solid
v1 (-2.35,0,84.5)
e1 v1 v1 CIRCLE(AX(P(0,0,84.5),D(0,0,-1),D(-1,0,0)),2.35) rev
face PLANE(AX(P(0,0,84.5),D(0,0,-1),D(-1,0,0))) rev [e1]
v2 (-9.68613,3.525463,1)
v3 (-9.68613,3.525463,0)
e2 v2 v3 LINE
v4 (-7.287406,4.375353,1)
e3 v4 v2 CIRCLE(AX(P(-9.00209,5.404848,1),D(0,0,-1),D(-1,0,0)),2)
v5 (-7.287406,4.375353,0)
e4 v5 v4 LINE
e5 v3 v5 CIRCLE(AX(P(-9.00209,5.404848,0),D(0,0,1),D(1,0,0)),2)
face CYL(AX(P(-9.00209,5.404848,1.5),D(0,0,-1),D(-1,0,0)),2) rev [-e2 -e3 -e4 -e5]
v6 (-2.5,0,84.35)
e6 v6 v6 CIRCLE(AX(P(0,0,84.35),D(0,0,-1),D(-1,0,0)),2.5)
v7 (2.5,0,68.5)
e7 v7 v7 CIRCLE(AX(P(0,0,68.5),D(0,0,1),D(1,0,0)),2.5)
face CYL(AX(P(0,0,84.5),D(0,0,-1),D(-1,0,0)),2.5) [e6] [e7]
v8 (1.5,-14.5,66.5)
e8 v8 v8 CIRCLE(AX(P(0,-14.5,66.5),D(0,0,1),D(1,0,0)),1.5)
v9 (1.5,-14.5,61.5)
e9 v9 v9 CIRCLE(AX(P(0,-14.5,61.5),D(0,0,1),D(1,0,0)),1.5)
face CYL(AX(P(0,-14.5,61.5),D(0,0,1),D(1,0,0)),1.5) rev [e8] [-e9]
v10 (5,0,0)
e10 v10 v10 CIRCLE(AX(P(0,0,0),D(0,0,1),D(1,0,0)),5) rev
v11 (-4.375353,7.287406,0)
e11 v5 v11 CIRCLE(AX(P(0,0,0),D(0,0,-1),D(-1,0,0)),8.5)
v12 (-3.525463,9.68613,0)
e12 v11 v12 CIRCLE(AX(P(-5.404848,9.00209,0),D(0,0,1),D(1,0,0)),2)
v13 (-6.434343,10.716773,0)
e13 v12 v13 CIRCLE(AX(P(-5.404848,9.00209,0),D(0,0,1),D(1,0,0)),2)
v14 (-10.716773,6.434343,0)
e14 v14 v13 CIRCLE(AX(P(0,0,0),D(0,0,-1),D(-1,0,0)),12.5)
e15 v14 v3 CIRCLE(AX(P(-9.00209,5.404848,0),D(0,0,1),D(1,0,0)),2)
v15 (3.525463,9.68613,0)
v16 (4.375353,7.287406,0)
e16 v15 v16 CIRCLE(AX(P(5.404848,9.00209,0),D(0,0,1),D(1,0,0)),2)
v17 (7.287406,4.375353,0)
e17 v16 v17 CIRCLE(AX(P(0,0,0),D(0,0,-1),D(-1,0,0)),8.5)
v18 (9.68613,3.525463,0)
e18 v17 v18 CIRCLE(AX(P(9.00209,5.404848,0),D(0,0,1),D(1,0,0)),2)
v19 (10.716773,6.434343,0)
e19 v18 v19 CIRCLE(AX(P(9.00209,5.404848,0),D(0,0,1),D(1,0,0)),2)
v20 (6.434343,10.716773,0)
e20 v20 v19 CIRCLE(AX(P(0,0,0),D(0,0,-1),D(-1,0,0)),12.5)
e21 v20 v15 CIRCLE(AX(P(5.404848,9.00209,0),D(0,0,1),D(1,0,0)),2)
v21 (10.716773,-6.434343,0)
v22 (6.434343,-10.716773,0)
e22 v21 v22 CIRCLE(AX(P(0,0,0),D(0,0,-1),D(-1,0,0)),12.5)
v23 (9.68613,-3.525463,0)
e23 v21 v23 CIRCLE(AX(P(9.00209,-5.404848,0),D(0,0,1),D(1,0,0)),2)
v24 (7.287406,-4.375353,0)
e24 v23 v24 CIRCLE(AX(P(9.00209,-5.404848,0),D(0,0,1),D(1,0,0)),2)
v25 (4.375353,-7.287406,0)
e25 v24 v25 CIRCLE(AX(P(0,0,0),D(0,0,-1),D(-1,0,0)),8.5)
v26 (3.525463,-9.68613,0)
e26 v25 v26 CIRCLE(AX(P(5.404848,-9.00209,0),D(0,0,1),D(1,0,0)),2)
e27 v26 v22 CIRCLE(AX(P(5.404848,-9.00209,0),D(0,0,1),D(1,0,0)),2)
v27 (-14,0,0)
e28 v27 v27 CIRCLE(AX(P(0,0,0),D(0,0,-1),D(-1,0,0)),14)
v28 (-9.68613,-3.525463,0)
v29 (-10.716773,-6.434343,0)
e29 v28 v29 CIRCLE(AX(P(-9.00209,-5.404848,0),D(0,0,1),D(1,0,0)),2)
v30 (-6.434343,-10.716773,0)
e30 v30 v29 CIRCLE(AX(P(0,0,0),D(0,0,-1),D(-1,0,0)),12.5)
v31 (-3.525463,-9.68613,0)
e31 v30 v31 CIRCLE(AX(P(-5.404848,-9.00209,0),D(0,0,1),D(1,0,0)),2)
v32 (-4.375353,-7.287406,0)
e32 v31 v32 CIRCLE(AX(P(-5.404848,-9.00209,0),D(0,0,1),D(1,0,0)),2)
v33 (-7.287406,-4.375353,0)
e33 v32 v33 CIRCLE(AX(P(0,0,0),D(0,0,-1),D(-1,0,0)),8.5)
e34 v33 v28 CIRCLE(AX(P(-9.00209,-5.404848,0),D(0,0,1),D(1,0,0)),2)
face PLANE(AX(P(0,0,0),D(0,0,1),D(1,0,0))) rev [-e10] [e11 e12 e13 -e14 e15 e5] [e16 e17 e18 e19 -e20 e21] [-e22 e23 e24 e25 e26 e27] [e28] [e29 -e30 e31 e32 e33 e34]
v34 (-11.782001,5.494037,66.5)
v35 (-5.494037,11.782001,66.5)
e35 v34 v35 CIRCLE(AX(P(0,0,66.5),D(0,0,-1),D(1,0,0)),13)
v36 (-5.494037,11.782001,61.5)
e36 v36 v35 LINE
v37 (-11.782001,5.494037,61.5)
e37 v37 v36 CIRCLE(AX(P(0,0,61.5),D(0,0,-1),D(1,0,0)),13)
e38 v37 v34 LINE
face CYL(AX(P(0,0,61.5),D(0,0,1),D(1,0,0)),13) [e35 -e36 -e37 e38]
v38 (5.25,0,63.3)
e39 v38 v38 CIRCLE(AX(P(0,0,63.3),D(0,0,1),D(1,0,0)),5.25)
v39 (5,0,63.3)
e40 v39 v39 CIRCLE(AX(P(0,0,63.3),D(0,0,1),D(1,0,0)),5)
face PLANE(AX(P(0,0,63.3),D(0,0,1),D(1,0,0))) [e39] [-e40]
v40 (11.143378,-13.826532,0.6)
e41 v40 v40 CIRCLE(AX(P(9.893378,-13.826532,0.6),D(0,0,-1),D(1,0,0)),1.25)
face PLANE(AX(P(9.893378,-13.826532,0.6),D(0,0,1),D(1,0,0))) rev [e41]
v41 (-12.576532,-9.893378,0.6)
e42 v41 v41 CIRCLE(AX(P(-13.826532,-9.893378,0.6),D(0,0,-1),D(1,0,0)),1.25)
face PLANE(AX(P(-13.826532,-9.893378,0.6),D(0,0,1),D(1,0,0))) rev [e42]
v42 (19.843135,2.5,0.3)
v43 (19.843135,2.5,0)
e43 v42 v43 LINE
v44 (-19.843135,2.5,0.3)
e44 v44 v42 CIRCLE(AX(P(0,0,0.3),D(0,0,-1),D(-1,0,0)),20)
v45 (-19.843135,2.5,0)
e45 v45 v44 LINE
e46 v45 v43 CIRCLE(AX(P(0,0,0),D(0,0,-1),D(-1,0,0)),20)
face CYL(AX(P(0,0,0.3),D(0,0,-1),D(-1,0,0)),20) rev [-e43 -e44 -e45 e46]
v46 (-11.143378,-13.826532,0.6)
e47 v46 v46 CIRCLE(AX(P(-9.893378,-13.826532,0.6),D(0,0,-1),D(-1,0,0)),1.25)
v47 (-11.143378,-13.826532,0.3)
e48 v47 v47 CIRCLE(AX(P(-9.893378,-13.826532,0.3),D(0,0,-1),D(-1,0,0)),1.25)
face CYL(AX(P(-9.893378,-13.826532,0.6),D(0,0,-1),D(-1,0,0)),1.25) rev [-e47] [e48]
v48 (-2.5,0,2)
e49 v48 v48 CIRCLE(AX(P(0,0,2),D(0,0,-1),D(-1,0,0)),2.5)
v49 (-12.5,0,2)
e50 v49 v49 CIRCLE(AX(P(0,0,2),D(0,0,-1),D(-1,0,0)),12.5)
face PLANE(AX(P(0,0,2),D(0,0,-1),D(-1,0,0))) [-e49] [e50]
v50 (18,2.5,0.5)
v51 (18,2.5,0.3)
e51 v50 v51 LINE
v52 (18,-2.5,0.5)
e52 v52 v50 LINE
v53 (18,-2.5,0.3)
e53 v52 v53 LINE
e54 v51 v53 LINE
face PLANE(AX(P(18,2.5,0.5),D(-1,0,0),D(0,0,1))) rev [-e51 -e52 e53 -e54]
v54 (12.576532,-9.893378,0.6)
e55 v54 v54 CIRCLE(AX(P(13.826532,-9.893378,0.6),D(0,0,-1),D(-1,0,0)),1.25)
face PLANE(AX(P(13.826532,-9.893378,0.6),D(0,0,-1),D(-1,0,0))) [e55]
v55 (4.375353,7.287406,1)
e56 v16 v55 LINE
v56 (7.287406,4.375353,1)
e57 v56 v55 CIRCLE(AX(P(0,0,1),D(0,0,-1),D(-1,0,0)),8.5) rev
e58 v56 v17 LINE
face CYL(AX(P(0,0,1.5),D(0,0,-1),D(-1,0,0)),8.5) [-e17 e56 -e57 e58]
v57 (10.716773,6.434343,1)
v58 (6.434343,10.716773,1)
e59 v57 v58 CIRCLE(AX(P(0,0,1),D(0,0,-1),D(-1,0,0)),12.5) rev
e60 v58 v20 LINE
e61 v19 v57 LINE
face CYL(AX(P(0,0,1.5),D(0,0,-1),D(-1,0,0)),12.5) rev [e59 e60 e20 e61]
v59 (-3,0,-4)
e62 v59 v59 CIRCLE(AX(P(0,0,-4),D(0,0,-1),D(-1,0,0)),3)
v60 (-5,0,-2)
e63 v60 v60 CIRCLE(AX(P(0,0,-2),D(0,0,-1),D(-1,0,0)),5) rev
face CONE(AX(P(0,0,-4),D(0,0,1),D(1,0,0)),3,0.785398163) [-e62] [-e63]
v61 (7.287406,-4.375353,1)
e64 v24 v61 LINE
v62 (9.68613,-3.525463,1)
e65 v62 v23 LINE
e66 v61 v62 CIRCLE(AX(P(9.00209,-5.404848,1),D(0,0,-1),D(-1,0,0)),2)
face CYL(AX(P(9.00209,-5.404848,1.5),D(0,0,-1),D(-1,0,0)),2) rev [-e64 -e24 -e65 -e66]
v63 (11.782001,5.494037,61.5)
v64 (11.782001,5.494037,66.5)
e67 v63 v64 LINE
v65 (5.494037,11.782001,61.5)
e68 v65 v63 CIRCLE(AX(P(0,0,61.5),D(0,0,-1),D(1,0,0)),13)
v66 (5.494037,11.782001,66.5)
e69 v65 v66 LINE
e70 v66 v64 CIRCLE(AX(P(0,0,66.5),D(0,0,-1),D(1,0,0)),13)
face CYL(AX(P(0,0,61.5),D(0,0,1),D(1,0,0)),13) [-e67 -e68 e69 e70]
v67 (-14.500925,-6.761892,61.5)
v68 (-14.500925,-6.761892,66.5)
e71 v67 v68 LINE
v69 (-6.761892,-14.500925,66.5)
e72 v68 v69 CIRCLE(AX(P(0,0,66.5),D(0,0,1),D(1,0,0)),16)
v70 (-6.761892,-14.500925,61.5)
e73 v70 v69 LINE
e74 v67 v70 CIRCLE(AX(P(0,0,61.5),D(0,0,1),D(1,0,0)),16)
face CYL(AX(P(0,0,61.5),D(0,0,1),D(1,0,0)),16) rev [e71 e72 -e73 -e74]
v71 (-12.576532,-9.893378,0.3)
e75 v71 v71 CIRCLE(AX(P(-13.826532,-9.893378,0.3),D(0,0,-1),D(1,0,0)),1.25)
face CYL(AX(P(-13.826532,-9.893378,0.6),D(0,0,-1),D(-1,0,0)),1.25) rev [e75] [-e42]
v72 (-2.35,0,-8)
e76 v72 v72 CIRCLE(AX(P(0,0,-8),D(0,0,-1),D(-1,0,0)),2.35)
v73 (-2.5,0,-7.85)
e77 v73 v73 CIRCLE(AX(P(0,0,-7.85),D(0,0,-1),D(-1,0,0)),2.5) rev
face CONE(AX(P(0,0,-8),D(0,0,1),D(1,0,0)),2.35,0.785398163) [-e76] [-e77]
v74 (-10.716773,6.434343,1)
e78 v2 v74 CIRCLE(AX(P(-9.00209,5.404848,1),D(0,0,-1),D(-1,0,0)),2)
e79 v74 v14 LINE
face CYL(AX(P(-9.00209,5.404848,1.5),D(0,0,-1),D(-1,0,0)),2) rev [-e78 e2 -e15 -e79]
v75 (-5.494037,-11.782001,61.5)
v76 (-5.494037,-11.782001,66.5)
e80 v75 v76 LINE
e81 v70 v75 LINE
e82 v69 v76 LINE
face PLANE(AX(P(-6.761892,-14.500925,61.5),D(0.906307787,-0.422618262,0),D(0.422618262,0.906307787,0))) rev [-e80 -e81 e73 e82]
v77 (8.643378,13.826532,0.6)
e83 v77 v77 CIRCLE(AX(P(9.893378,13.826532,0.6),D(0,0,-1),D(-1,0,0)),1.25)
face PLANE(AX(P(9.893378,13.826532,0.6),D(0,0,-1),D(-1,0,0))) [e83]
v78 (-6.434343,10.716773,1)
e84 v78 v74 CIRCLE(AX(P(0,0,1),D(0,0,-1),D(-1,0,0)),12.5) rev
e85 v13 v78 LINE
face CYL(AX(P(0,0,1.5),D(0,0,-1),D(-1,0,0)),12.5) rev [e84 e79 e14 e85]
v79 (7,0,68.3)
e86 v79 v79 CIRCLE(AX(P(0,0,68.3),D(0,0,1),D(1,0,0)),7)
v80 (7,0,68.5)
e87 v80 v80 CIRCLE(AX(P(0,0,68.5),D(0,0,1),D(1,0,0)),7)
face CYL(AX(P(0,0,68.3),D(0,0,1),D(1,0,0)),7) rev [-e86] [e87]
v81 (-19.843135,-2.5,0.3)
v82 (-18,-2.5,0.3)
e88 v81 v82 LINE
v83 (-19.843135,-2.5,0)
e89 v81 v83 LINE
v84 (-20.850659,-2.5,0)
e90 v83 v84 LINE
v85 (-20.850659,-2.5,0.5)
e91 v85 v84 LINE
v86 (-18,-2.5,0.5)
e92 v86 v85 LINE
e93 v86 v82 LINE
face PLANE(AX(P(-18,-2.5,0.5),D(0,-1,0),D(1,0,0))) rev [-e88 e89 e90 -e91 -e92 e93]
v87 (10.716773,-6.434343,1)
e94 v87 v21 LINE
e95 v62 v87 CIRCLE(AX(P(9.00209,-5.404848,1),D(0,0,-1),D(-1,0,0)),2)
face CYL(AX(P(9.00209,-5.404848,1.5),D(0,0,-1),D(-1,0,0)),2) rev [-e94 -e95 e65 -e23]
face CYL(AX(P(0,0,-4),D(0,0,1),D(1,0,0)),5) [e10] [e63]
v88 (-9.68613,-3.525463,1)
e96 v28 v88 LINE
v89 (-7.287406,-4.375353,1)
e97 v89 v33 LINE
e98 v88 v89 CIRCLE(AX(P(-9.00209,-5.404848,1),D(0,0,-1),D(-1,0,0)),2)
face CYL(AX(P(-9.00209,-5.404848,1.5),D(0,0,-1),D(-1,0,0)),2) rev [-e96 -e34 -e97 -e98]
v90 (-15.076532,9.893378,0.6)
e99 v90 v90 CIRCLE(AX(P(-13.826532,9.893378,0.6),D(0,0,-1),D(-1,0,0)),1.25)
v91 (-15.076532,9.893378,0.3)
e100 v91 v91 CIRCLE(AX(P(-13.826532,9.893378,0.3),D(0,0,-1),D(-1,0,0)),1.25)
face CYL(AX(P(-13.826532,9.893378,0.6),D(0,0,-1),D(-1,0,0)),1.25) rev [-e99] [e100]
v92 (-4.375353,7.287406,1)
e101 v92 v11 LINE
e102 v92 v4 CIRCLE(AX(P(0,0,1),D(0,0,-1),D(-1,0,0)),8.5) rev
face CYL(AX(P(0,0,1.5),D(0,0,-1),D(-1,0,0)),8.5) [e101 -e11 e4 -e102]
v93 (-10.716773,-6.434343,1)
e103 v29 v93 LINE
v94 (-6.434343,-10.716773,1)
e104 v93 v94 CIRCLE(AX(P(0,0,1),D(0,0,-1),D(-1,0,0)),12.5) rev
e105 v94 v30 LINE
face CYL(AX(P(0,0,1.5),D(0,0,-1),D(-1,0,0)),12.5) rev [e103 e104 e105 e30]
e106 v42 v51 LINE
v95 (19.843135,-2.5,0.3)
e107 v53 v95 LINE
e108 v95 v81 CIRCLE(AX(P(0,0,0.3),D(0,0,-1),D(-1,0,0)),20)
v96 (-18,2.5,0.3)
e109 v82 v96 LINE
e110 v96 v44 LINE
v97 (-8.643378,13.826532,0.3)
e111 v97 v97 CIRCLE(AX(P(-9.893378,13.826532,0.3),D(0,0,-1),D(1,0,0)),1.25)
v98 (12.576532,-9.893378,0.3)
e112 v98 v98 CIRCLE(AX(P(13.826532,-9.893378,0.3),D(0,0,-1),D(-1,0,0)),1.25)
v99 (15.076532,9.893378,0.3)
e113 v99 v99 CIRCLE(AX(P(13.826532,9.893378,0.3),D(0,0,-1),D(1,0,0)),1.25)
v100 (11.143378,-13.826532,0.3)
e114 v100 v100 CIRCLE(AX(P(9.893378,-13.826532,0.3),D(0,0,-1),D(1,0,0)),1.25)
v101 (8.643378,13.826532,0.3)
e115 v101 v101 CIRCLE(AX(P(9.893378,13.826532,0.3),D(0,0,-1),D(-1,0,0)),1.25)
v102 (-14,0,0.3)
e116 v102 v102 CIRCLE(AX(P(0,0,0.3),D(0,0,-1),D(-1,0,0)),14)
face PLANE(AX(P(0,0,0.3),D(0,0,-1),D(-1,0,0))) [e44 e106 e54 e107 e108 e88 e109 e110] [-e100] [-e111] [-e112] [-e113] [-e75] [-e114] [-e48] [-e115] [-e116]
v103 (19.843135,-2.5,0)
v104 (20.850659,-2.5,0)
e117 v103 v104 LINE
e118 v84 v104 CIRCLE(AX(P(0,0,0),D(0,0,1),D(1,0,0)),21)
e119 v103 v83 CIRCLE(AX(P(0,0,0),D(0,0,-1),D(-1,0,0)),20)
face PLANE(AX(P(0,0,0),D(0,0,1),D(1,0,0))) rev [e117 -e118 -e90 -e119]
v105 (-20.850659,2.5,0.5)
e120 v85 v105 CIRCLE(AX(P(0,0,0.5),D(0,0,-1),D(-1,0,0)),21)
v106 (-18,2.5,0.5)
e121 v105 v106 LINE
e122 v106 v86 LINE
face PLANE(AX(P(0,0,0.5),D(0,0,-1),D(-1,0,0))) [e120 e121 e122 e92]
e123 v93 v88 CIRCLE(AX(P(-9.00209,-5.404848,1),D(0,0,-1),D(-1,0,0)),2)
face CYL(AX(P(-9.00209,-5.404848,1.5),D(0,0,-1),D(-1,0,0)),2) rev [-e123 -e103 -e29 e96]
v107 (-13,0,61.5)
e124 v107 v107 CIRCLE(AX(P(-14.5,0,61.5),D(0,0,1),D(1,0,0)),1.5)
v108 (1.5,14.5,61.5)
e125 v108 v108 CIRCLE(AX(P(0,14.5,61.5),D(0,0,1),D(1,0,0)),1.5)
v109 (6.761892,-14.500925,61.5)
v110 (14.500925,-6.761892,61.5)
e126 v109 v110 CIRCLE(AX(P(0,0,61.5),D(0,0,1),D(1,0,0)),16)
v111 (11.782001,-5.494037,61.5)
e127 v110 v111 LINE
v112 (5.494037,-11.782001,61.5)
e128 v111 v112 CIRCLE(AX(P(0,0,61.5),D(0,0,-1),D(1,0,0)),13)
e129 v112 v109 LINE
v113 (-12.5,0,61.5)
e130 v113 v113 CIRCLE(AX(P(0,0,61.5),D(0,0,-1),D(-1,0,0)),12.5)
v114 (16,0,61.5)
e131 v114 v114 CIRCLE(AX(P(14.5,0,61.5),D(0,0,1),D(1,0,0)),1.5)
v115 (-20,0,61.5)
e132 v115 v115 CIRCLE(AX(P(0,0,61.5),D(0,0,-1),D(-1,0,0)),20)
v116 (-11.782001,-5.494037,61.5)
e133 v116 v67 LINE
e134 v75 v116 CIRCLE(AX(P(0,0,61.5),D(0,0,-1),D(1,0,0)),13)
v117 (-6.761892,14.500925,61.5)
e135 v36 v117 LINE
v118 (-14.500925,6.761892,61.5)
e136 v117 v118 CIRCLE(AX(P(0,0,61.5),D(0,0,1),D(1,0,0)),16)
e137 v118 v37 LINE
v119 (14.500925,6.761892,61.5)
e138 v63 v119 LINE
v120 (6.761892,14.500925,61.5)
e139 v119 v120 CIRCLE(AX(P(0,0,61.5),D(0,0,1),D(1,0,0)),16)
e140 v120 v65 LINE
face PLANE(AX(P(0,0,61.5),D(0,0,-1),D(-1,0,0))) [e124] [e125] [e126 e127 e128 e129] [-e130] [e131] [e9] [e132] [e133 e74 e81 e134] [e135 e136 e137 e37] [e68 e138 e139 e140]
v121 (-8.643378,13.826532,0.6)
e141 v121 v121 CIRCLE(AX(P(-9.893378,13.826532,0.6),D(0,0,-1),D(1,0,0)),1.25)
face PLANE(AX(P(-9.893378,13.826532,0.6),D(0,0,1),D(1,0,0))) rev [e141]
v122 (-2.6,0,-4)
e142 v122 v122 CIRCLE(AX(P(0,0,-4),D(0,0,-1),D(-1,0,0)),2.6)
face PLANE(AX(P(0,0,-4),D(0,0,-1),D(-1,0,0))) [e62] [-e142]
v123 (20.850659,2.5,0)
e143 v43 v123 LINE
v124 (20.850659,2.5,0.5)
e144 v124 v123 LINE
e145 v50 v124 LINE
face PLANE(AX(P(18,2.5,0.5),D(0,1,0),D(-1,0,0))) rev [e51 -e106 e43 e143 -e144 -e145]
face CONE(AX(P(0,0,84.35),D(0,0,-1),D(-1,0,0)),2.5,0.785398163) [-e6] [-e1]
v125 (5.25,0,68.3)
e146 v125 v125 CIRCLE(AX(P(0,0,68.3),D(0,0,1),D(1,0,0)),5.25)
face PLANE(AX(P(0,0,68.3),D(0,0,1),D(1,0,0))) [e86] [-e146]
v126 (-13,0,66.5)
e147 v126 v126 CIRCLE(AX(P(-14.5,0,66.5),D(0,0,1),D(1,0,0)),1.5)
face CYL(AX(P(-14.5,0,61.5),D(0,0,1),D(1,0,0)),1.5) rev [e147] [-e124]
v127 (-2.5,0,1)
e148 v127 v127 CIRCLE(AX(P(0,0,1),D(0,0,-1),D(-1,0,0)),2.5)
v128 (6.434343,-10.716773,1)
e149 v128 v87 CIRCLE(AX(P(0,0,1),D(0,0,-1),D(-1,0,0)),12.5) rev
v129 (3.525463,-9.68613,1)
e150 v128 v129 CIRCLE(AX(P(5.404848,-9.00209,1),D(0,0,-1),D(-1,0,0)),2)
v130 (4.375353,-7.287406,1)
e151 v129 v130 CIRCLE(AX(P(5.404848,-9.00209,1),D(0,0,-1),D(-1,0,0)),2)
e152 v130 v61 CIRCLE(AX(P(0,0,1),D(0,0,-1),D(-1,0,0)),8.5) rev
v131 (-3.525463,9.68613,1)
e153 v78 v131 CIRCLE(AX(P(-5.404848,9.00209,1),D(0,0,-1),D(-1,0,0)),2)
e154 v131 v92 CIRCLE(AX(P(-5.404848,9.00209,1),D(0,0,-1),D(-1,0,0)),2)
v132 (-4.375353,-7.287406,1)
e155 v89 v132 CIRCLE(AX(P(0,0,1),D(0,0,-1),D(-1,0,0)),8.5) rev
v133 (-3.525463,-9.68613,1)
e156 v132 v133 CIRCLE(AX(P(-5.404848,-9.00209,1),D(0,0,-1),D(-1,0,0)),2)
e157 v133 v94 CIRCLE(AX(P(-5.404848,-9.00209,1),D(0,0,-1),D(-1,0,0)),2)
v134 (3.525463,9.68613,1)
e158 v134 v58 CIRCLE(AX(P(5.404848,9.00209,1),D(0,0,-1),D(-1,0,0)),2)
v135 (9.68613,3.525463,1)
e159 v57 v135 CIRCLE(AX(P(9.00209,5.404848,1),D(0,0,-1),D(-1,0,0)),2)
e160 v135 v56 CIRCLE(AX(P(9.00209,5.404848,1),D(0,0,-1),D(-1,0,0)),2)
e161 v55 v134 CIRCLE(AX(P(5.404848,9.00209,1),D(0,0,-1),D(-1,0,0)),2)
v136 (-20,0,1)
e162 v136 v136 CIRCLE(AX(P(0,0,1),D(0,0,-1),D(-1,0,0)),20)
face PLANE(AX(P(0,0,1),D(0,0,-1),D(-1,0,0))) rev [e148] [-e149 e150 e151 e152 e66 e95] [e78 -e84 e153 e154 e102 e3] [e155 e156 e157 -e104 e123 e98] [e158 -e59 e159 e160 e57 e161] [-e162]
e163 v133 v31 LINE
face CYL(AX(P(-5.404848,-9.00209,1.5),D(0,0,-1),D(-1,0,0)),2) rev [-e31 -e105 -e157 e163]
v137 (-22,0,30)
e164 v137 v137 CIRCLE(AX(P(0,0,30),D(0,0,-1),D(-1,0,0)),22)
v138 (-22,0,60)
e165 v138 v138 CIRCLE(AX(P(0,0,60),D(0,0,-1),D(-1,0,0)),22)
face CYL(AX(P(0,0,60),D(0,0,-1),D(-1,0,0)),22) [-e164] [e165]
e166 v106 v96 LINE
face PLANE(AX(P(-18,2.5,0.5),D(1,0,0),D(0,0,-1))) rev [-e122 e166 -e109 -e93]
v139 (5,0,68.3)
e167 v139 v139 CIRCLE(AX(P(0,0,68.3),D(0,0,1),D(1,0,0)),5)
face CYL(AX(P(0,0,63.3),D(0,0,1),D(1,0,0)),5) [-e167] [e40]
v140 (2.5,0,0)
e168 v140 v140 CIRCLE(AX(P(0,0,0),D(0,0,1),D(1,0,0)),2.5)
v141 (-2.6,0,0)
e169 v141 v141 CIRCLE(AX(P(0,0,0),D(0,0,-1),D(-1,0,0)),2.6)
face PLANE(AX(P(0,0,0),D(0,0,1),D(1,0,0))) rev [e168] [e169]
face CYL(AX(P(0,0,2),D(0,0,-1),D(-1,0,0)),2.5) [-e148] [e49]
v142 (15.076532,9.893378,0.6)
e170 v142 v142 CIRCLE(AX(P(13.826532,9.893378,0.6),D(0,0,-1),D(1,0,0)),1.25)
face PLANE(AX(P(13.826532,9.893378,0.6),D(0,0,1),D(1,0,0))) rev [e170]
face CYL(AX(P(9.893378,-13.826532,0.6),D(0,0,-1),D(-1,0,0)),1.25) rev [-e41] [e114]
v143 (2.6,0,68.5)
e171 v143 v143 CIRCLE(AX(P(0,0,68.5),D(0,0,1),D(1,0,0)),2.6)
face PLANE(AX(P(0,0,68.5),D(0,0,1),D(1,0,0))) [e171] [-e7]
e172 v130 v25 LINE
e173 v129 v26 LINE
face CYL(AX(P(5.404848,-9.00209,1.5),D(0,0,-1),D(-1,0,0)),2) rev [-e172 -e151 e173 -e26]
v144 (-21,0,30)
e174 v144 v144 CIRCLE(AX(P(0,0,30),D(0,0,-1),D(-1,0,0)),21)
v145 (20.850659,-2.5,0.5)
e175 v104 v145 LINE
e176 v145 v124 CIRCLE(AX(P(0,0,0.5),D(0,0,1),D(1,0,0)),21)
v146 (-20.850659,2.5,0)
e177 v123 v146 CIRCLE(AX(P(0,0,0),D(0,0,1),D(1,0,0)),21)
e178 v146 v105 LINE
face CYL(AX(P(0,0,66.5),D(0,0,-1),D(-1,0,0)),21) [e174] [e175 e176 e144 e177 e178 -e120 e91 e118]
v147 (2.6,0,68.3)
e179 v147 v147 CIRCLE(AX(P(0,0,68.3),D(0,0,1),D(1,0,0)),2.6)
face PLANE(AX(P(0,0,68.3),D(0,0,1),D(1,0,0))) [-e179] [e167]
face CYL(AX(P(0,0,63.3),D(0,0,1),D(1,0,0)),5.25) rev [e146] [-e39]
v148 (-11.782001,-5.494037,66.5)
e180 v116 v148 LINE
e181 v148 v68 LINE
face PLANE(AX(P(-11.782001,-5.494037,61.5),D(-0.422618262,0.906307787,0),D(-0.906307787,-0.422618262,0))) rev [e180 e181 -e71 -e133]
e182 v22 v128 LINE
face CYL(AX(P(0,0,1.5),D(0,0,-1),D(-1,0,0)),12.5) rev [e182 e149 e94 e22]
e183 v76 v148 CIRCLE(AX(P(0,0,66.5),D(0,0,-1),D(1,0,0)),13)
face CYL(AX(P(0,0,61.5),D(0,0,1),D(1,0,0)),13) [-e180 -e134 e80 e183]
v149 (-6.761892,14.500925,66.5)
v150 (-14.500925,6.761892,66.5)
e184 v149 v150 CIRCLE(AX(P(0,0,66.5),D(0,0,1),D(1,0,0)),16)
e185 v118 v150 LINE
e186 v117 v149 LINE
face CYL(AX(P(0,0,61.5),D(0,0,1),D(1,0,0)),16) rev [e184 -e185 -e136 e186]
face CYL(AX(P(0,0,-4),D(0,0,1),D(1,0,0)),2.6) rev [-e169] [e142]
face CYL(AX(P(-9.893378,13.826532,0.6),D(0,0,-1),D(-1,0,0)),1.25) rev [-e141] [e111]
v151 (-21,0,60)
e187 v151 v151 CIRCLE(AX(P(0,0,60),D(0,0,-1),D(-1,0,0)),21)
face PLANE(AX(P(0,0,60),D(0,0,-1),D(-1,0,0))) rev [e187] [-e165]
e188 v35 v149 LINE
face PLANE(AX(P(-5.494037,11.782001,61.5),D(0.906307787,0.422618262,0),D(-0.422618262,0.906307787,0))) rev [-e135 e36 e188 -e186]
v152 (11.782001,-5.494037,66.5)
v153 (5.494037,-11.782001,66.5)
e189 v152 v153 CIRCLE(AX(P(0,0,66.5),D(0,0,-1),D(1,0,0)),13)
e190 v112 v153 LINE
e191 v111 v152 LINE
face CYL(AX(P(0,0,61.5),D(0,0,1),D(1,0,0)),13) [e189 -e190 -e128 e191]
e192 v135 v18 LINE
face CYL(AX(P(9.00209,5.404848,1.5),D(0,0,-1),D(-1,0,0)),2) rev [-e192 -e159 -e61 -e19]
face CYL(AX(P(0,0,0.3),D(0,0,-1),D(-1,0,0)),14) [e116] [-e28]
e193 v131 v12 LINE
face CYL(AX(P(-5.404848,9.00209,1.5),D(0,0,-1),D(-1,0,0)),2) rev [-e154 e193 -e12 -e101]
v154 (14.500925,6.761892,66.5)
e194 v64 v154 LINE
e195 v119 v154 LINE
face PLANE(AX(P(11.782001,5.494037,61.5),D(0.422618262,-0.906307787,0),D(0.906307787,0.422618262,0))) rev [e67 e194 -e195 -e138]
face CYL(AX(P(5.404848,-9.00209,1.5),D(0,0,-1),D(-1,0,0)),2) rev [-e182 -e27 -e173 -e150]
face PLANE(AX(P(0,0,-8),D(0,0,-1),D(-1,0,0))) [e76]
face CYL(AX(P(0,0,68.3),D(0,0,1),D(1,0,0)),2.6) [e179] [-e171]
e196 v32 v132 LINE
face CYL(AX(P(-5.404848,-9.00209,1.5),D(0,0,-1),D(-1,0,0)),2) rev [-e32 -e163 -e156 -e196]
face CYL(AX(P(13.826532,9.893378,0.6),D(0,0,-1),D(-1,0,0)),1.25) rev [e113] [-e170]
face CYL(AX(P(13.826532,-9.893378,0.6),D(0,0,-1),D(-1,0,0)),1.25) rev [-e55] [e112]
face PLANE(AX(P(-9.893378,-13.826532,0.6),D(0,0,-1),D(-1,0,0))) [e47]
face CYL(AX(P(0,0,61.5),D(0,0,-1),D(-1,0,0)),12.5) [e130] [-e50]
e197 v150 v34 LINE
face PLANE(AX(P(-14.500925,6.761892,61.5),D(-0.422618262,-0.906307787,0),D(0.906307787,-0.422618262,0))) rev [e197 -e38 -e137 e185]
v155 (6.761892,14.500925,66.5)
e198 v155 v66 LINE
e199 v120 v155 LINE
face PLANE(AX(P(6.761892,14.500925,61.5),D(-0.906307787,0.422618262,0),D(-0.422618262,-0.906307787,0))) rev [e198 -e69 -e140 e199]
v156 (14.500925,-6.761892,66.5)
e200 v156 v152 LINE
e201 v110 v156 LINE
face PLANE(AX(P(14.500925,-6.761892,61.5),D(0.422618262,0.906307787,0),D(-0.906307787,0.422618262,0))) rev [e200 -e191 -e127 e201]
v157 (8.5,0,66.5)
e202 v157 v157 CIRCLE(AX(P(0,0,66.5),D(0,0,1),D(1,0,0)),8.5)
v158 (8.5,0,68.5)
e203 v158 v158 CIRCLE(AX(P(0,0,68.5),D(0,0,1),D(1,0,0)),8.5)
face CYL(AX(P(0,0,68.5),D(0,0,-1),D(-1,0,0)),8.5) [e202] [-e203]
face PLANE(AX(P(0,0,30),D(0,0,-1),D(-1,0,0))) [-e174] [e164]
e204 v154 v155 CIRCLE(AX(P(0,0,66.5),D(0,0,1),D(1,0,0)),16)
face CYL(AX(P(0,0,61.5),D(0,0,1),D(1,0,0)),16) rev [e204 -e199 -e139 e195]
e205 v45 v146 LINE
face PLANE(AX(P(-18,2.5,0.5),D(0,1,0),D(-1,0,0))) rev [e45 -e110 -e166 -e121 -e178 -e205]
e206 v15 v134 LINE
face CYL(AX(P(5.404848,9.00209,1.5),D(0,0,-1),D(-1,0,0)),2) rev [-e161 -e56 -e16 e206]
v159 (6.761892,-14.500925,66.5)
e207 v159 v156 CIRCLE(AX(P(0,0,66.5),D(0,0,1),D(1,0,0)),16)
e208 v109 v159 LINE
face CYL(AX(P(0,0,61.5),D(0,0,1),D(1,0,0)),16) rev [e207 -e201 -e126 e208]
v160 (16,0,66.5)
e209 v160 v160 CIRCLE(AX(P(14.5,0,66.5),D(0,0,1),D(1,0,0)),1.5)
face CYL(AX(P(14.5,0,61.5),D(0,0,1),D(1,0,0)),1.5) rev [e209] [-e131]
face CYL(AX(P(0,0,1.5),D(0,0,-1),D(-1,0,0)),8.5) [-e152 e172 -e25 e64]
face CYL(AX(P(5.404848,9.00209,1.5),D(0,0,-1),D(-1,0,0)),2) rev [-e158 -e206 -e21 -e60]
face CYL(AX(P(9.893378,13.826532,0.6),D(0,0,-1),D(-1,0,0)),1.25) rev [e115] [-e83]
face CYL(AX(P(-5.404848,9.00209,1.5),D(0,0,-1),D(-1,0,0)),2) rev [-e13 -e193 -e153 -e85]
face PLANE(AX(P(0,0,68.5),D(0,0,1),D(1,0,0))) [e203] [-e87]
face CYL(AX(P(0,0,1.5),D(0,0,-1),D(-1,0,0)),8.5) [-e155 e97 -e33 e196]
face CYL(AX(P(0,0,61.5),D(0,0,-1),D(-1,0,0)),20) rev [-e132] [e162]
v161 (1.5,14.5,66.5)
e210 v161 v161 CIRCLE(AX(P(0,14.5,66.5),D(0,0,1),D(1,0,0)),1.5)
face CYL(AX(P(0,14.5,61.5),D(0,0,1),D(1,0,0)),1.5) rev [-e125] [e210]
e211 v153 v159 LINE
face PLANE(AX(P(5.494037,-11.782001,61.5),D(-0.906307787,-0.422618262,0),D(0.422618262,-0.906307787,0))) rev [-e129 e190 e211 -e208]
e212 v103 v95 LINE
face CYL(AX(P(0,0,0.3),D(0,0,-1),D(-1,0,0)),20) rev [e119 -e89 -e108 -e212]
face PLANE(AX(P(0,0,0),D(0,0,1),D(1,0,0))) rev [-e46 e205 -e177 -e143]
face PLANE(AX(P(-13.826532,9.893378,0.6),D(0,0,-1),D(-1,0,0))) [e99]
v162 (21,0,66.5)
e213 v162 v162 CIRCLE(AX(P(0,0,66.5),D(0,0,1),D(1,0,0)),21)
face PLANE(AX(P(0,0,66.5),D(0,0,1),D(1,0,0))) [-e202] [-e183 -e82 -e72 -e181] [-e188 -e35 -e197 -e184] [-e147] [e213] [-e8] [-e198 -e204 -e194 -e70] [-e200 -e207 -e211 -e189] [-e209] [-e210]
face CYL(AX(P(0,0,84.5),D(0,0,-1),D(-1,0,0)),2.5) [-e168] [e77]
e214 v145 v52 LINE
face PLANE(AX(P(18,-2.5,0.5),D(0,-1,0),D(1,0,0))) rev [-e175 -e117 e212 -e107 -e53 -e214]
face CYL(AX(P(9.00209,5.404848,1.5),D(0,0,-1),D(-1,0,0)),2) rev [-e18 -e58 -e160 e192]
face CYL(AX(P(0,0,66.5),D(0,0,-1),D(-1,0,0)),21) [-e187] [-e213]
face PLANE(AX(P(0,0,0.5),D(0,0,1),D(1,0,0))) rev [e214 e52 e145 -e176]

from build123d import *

# Parameters (mm, degrees)
SKETCH1_R           = 21
BOSS_EXTRUDE1_DEPTH = 66.5
SKETCH2_R           = 8.5
BOSS_EXTRUDE2_DEPTH = 2
BOSS_EXTRUDE3_START = 8
SKETCH4_R           = 2.5
BOSS_EXTRUDE3_DEPTH = 92.5
CHAMFER1_SIZE       = 0.15
SKETCH5_R           = 1.5
CUT_EXTRUDE1_DEPTH  = 5
SKETCH7_W           = 3
SKETCH7_H           = 5
CUT_EXTRUDE2_DEPTH  = 0.5
CUT_EXTRUDE3_DEPTH  = 5
BOSS_EXTRUDE4_START = -30
SKETCH9_R           = 22
BOSS_EXTRUDE4_DEPTH = 30
CUT_EXTRUDE5_START  = -2
SKETCH10_R          = 20
SKETCH10_R_2        = 12.5
CUT_EXTRUDE5_DEPTH  = 59.5
SKETCH12_R          = 5
SKETCH12_R_2        = 2.6
BOSS_EXTRUDE5_DEPTH = 4
CHAMFER2_SIZE       = 2
SKETCH14_R          = 20
SKETCH14_R_2        = 14
CUT_EXTRUDE6_DEPTH  = 0.3
SKETCH15_R          = 7
SKETCH15_R_2        = 2.6
CUT_EXTRUDE7_DEPTH  = 0.2
SKETCH16_R          = 5.25
SKETCH16_R_2        = 5
CUT_EXTRUDE8_DEPTH  = 5
SKETCH17_R          = 1.25
CUT_EXTRUDE9_DEPTH  = 0.3
CUT_EXTRUDE12_DEPTH = 1.5
CUT_EXTRUDE13_START = -1
SKETCH20_R          = 20
SKETCH20_R_2        = 2.5
CUT_EXTRUDE13_DEPTH = 1
FILLET1_R           = 2


with BuildPart() as part:
    # Sketch1 → Boss-Extrude1 (new body)
    with BuildSketch(Plane.XY):
        Circle(SKETCH1_R)
    extrude(amount=BOSS_EXTRUDE1_DEPTH)

    # Sketch2 → Boss-Extrude2 (add)
    with BuildSketch(Plane.XY.offset(66.5)):
        Circle(SKETCH2_R)
    extrude(amount=BOSS_EXTRUDE2_DEPTH)

    # Sketch4 → Boss-Extrude3 (add)
    with BuildSketch(Plane(origin=(0, 0, 0), x_dir=(-1, 0, 0), z_dir=(0, 0, -1)).offset(BOSS_EXTRUDE3_START)):
        Circle(SKETCH4_R)
    extrude(amount=-BOSS_EXTRUDE3_DEPTH)

    # Chamfer1
    chamfer1_edges = [part.edges().sort_by_distance(p)[0] for p in [
        (2.5, 0, 84.5),
        (2.5, 0, -8),
    ]]
    chamfer(chamfer1_edges, length=CHAMFER1_SIZE)

    # Sketch5 → Cut-Extrude1 (cut)
    with BuildSketch(Plane.XY.offset(66.5)):
        with Locations((0, 14.5)):
            Circle(SKETCH5_R)
        with Locations((14.5, 0)):
            Circle(SKETCH5_R)
        with Locations((0, -14.5)):
            Circle(SKETCH5_R)
        with Locations((-14.5, 0)):
            Circle(SKETCH5_R)
    extrude(amount=-CUT_EXTRUDE1_DEPTH, mode=Mode.SUBTRACT)

    # Sketch7 → Cut-Extrude2 (cut)
    with BuildSketch(Plane(origin=(0, 0, 0), x_dir=(-1, 0, 0), z_dir=(0, 0, -1))):
        with Locations((19.5, 0)):
            Rectangle(SKETCH7_W, SKETCH7_H)
        with Locations((-19.5, 0)):
            Rectangle(SKETCH7_W, SKETCH7_H)
    extrude(amount=-CUT_EXTRUDE2_DEPTH, mode=Mode.SUBTRACT)

    # Sketch8 → Cut-Extrude3 (cut)
    with BuildSketch(Plane.XY.offset(66.5)):
        with BuildLine():
            Line((6.761892188, 14.500924593), (5.494037403, 11.782001231))
            ThreePointArc((5.494037403, 11.782001231), (9.192388155, 9.192388155), (11.782001231, 5.494037403))
            Line((11.782001231, 5.494037403), (14.500924593, 6.761892188))
            ThreePointArc((14.500924593, 6.761892188), (11.313708499, 11.313708499), (6.761892188, 14.500924593))
        make_face()
        with BuildLine():
            Line((5.494037403, -11.782001231), (6.761892188, -14.500924593))
            ThreePointArc((6.761892188, -14.500924593), (11.313708499, -11.313708499), (14.500924593, -6.761892188))
            Line((14.500924593, -6.761892188), (11.782001231, -5.494037403))
            ThreePointArc((11.782001231, -5.494037403), (9.192388155, -9.192388155), (5.494037403, -11.782001231))
        make_face()
        with BuildLine():
            Line((-11.782001231, -5.494037403), (-14.500924593, -6.761892188))
            ThreePointArc((-14.500924593, -6.761892188), (-11.313708499, -11.313708499), (-6.761892188, -14.500924593))
            Line((-6.761892188, -14.500924593), (-5.494037403, -11.782001231))
            ThreePointArc((-5.494037403, -11.782001231), (-9.192388155, -9.192388155), (-11.782001231, -5.494037403))
        make_face()
        with BuildLine():
            Line((-5.494037403, 11.782001231), (-6.761892188, 14.500924593))
            ThreePointArc((-6.761892188, 14.500924593), (-11.313708499, 11.313708499), (-14.500924593, 6.761892188))
            Line((-14.500924593, 6.761892188), (-11.782001231, 5.494037403))
            ThreePointArc((-11.782001231, 5.494037403), (-9.192388155, 9.192388155), (-5.494037403, 11.782001231))
        make_face()
    extrude(amount=-CUT_EXTRUDE3_DEPTH, mode=Mode.SUBTRACT)

    # Sketch9 → Boss-Extrude4 (add)
    with BuildSketch(Plane(origin=(0, 0, 0), x_dir=(-1, 0, 0), z_dir=(0, 0, -1)).offset(BOSS_EXTRUDE4_START)):
        Circle(SKETCH9_R)
    extrude(amount=-BOSS_EXTRUDE4_DEPTH)

    # Sketch10 → Cut-Extrude5 (cut)
    with BuildSketch(Plane(origin=(0, 0, 0), x_dir=(-1, 0, 0), z_dir=(0, 0, -1)).offset(CUT_EXTRUDE5_START)):
        Circle(SKETCH10_R)
        Circle(SKETCH10_R_2, mode=Mode.SUBTRACT)
    extrude(amount=-CUT_EXTRUDE5_DEPTH, mode=Mode.SUBTRACT)

    # Sketch12 → Boss-Extrude5 (add)
    with BuildSketch(Plane(origin=(0, 0, 0), x_dir=(-1, 0, 0), z_dir=(0, 0, -1))):
        with Locations(Location((0, 0, 0), (0, 0, 180))):
            Circle(SKETCH12_R)
        Circle(SKETCH12_R_2, mode=Mode.SUBTRACT)
    extrude(amount=BOSS_EXTRUDE5_DEPTH)

    # Chamfer2
    chamfer2_edges = [part.edges().sort_by_distance(p)[0] for p in [
        (-5, 0, -4),
    ]]
    chamfer(chamfer2_edges, length=CHAMFER2_SIZE)

    # Sketch14 → Cut-Extrude6 (cut)
    with BuildSketch(Plane(origin=(0, 0, 0), x_dir=(-1, 0, 0), z_dir=(0, 0, -1))):
        Circle(SKETCH14_R)
        Circle(SKETCH14_R_2, mode=Mode.SUBTRACT)
    extrude(amount=-CUT_EXTRUDE6_DEPTH, mode=Mode.SUBTRACT)

    # Sketch15 → Cut-Extrude7 (cut)
    with BuildSketch(Plane.XY.offset(68.5)):
        Circle(SKETCH15_R)
        with Locations(Location((0, 0, 0), (0, 0, 180))):
            Circle(SKETCH15_R_2, mode=Mode.SUBTRACT)
    extrude(amount=-CUT_EXTRUDE7_DEPTH, mode=Mode.SUBTRACT)

    # Sketch16 → Cut-Extrude8 (cut)
    with BuildSketch(Plane.XY.offset(68.3)):
        Circle(SKETCH16_R)
        Circle(SKETCH16_R_2, mode=Mode.SUBTRACT)
    extrude(amount=-CUT_EXTRUDE8_DEPTH, mode=Mode.SUBTRACT)

    # Sketch17 → Cut-Extrude9 (cut)
    with BuildSketch(Plane(origin=(0, 0, 0.3), x_dir=(-1, 0, 0), z_dir=(0, 0, -1))):
        with Locations((13.826532207, 9.893378466)):
            Circle(SKETCH17_R)
        with Locations(Location((9.893378466, 13.826532207, 0), (0, 0, 180))):
            Circle(SKETCH17_R)
        with Locations(Location((13.826532207, -9.893378466, 0), (0, 0, 180))):
            Circle(SKETCH17_R)
        with Locations((9.893378466, -13.826532207)):
            Circle(SKETCH17_R)
        with Locations(Location((-9.893378466, -13.826532207, 0), (0, 0, 180))):
            Circle(SKETCH17_R)
        with Locations((-13.826532207, -9.893378466)):
            Circle(SKETCH17_R)
        with Locations(Location((-13.826532207, 9.893378466, 0), (0, 0, 180))):
            Circle(SKETCH17_R)
        with Locations((-9.893378466, 13.826532207)):
            Circle(SKETCH17_R)
    extrude(amount=-CUT_EXTRUDE9_DEPTH, mode=Mode.SUBTRACT)

    # Sketch19 → Cut-Extrude12 (cut)
    with BuildSketch(Plane(origin=(0, 0, 0), x_dir=(-1, 0, 0), z_dir=(0, 0, -1))):
        with BuildLine():
            ThreePointArc((-7.987387277, -2.907171218), (-6.01040764, -6.01040764), (-2.907171218, -7.987387277))
            Line((-2.907171218, -7.987387277), (-4.275251792, -11.74615776))
            ThreePointArc((-4.275251792, -11.74615776), (-8.838834765, -8.838834765), (-11.74615776, -4.275251792))
            Line((-11.74615776, -4.275251792), (-7.987387277, -2.907171218))
        make_face()
        with BuildLine():
            ThreePointArc((7.987387277, 2.907171218), (6.01040764, 6.01040764), (2.907171218, 7.987387277))
            Line((2.907171218, 7.987387277), (4.275251792, 11.74615776))
            ThreePointArc((4.275251792, 11.74615776), (8.838834765, 8.838834765), (11.74615776, 4.275251792))
            Line((11.74615776, 4.275251792), (7.987387277, 2.907171218))
        make_face()
        with BuildLine():
            ThreePointArc((2.907171218, -7.987387277), (6.01040764, -6.01040764), (7.987387277, -2.907171218))
            Line((7.987387277, -2.907171218), (11.74615776, -4.275251792))
            ThreePointArc((11.74615776, -4.275251792), (8.838834765, -8.838834765), (4.275251792, -11.74615776))
            Line((4.275251792, -11.74615776), (2.907171218, -7.987387277))
        make_face()
        with BuildLine():
            ThreePointArc((-2.907171218, 7.987387277), (-6.01040764, 6.01040764), (-7.987387277, 2.907171218))
            Line((-7.987387277, 2.907171218), (-11.74615776, 4.275251792))
            ThreePointArc((-11.74615776, 4.275251792), (-8.838834765, 8.838834765), (-4.275251792, 11.74615776))
            Line((-4.275251792, 11.74615776), (-2.907171218, 7.987387277))
        make_face()
    extrude(amount=-CUT_EXTRUDE12_DEPTH, mode=Mode.SUBTRACT)

    # Sketch20 → Cut-Extrude13 (cut)
    with BuildSketch(Plane(origin=(0, 0, 0), x_dir=(-1, 0, 0), z_dir=(0, 0, -1)).offset(CUT_EXTRUDE13_START)):
        Circle(SKETCH20_R)
        Circle(SKETCH20_R_2, mode=Mode.SUBTRACT)
    extrude(amount=-CUT_EXTRUDE13_DEPTH, mode=Mode.SUBTRACT)

    # Fillet1
    fillet1_edges = [part.edges().sort_by_distance(p)[0] for p in [
        (2.907171218, -7.987387277, 0.5),
        (4.275251792, -11.74615776, 0.5),
        (-4.275251792, -11.74615776, 0.5),
        (-11.74615776, -4.275251792, 0.5),
        (-2.907171218, -7.987387277, 0.5),
        (11.74615776, -4.275251792, 0.5),
        (7.987387277, -2.907171218, 0.5),
        (-7.987387277, -2.907171218, 0.5),
        (-11.74615776, 4.275251792, 0.5),
        (-7.987387277, 2.907171218, 0.5),
        (7.987387277, 2.907171218, 0.5),
        (2.907171218, 7.987387277, 0.5),
        (4.275251792, 11.74615776, 0.5),
        (11.74615776, 4.275251792, 0.5),
        (-2.907171218, 7.987387277, 0.5),
        (-4.275251792, 11.74615776, 0.5),
    ]]
    fillet(fillet1_edges, radius=FILLET1_R - 0.0001)  # a hair under: the kernel refuses the full size


solid = part.part
